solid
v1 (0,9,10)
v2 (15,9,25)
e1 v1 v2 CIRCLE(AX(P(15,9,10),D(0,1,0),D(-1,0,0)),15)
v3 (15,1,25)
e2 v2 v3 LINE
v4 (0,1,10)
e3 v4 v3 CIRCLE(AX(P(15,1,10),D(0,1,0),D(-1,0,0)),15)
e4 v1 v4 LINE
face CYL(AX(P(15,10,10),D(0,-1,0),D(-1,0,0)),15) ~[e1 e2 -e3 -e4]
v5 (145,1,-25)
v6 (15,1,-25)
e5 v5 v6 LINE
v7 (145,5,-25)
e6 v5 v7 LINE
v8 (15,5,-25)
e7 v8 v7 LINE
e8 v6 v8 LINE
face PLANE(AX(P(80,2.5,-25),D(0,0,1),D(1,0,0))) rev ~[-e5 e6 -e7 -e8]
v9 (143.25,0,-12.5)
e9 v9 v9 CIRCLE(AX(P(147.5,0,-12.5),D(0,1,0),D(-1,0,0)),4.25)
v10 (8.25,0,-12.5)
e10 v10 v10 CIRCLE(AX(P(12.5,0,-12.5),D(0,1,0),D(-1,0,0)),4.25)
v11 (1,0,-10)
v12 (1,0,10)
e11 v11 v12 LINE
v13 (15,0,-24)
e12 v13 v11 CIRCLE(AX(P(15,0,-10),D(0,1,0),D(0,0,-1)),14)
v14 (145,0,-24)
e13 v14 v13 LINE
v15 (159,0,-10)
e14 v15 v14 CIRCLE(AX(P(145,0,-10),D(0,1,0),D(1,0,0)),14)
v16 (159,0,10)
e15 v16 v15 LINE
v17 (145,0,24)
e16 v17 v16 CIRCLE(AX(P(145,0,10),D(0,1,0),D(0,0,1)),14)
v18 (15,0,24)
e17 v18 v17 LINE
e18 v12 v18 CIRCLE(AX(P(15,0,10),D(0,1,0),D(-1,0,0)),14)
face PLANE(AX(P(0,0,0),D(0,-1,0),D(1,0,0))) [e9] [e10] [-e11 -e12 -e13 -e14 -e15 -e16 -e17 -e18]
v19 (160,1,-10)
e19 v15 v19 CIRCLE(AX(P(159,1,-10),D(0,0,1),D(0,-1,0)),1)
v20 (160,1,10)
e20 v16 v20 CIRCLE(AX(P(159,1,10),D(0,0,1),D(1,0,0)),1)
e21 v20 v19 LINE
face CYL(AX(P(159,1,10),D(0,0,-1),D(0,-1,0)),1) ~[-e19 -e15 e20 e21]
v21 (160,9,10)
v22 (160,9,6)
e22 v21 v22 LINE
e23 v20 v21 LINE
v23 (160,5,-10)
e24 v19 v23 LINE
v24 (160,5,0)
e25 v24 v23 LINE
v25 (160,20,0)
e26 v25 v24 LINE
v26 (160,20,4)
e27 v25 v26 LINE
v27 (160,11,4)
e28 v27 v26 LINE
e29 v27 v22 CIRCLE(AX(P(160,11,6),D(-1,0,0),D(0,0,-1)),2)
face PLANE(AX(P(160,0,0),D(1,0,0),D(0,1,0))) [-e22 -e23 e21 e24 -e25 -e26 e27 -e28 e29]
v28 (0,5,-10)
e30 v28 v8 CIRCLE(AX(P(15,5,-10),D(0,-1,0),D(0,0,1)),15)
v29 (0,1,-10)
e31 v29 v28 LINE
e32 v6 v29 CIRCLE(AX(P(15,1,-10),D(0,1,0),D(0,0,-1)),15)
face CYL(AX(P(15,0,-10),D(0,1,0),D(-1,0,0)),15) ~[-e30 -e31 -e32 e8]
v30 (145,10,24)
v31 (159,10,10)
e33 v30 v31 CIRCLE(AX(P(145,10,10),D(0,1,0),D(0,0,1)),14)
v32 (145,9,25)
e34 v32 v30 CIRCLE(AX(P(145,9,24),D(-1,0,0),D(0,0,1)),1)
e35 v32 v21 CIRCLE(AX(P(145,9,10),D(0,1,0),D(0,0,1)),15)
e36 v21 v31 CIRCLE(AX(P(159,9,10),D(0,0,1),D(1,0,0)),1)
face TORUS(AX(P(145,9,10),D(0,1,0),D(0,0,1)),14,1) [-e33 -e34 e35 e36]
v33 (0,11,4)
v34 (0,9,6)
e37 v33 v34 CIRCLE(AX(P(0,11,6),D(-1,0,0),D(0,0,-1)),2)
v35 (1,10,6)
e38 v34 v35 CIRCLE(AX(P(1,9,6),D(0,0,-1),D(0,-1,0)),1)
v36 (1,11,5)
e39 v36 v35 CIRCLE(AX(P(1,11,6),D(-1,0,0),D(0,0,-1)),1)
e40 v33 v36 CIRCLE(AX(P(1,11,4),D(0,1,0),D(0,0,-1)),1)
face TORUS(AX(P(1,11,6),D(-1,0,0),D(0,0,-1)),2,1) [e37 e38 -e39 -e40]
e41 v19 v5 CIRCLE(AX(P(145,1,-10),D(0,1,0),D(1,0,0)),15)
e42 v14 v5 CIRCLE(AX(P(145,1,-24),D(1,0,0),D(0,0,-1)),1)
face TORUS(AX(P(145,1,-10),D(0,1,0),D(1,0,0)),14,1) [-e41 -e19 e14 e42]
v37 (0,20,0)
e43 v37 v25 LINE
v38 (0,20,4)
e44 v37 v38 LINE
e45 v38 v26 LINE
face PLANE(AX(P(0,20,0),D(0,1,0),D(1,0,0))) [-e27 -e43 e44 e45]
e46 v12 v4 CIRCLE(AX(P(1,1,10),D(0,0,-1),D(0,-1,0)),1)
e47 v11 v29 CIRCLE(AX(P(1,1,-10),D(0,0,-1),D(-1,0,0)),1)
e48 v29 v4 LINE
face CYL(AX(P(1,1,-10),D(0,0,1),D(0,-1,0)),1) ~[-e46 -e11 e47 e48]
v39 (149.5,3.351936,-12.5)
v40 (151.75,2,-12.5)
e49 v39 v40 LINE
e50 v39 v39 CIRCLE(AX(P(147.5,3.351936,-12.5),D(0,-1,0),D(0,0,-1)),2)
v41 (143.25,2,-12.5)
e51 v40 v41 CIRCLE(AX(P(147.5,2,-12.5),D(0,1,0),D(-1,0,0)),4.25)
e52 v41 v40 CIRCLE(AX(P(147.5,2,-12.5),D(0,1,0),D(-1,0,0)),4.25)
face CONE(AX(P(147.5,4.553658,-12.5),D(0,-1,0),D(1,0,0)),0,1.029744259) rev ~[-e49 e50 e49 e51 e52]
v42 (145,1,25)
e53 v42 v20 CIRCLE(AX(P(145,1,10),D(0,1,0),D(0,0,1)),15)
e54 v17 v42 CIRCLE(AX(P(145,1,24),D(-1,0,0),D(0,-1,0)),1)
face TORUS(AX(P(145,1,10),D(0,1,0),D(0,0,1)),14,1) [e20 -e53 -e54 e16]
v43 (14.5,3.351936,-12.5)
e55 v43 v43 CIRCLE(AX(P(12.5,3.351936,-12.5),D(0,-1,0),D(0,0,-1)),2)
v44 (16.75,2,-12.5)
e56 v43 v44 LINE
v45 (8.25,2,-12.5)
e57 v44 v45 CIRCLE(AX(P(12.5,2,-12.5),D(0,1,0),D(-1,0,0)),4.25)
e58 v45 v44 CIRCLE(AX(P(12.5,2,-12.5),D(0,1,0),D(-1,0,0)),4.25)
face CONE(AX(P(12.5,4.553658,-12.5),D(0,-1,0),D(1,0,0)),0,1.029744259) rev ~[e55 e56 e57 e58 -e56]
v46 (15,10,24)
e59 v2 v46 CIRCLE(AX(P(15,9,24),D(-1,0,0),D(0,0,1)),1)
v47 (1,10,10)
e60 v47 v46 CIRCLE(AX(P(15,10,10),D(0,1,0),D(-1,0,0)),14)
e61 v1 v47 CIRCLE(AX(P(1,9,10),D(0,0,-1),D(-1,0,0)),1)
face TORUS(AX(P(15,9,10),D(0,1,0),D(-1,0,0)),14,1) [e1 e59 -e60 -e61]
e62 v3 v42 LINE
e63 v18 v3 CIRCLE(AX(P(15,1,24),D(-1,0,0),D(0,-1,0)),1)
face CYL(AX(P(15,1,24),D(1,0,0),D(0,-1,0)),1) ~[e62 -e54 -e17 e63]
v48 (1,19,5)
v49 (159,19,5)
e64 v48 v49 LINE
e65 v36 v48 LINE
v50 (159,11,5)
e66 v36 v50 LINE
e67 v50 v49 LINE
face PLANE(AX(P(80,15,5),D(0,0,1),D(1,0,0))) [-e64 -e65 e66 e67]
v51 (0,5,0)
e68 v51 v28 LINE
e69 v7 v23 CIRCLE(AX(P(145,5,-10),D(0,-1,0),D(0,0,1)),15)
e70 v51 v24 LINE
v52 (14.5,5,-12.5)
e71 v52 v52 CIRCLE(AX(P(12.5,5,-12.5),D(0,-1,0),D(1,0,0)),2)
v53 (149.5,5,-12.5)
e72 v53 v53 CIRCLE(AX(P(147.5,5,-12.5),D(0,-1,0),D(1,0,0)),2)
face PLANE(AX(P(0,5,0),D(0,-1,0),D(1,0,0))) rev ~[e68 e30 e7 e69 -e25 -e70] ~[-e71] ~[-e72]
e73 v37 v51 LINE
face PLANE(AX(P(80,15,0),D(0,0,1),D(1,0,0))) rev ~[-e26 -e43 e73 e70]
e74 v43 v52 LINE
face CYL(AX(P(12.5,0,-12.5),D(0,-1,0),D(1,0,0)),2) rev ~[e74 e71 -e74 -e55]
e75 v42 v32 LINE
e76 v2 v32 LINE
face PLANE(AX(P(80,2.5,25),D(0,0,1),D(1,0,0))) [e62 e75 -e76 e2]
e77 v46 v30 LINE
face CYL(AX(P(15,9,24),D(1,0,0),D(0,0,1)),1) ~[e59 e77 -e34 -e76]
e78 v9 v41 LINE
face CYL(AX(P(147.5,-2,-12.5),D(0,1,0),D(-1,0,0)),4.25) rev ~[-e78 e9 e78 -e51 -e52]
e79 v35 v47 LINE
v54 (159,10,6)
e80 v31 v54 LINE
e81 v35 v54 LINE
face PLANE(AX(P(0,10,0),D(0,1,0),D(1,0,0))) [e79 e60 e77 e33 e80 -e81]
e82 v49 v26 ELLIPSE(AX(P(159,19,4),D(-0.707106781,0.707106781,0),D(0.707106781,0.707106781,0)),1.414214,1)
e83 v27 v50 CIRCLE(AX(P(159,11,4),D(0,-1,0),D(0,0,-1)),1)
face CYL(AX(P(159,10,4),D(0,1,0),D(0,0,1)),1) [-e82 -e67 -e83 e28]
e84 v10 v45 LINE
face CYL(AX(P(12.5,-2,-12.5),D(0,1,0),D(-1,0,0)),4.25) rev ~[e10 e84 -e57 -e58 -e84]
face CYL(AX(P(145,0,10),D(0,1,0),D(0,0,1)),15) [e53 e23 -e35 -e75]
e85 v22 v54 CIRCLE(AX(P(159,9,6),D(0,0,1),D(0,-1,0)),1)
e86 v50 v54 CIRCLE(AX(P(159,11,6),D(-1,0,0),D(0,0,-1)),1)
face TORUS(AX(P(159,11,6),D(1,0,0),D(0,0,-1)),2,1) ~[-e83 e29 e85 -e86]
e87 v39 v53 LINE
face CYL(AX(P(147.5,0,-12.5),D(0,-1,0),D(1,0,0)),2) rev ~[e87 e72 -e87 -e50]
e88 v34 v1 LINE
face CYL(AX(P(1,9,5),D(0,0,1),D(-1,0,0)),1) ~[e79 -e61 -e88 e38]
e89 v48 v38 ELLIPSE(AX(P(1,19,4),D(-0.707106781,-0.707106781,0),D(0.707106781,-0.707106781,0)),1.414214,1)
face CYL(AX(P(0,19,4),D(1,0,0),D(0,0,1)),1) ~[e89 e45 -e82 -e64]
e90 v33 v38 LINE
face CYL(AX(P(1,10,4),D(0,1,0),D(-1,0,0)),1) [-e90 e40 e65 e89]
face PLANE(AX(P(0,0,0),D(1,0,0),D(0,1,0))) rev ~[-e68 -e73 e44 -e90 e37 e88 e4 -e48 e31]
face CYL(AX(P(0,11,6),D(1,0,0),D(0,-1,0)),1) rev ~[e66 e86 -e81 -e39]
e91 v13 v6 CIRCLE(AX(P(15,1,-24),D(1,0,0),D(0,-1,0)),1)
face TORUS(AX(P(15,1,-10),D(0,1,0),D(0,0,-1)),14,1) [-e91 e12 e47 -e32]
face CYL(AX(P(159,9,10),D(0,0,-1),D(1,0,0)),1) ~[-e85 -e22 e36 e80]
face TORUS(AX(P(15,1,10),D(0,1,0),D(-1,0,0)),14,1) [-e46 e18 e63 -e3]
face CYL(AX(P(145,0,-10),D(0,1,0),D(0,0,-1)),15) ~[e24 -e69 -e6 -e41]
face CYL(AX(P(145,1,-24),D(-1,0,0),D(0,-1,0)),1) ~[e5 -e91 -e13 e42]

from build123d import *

# Parameters (mm, degrees)
F0_W     = 160
F0_H     = 5
F1_DEPTH = 25
F0_H_2   = 10
F2_DEPTH = 5
F3_DEPTH = 25
F4_R     = 2
F5_DEPTH = 5
F6_D     = 8.5
F6_DEPTH = 2
F6_TIP   = 2.5536576309
F7_R     = 15
F8_R     = 1


with BuildPart() as f1:
    # F0 (on Top) → F1 (new body)
    with BuildSketch(Plane.XY):
        with Locations((80, 2.5)):
            Rectangle(F0_W, F0_H)
        with Locations((80, 7.5)):
            Rectangle(F0_W, F0_H)
    extrude(amount=F1_DEPTH)

    # F0 (on Top) → F2 (join)
    with BuildSketch(Plane.XY):
        with Locations((80, 15)):
            Rectangle(F0_W, F0_H_2)
    extrude(amount=F2_DEPTH)

    # F0 (on Top) → F3 (join)
    with BuildSketch(Plane.XY):
        with Locations((80, 2.5)):
            Rectangle(F0_W, F0_H)
    extrude(amount=-F3_DEPTH)

    # F4 (on face) → F5 (cut, through all)
    with BuildSketch(Plane.XZ):
        with Locations((12.5, -12.5)):
            Circle(F4_R)
        with Locations((147.5, -12.5)):
            Circle(F4_R)
    extrude(amount=-F5_DEPTH, mode=Mode.SUBTRACT)

    # F6
    with Locations(Plane.XZ):
        with Locations((12.5, -12.5), (147.5, -12.5)):
            Hole(F6_D / 2, depth=F6_DEPTH)
            with Locations((0, 0, -(F6_DEPTH + F6_TIP / 2))):  # 118° drill point
                Cone(0, F6_D / 2, F6_TIP, mode=Mode.SUBTRACT)

    # F7
    f7_edges = [f1.edges().sort_by_distance(p)[0] for p in [
        (160, 2.5, -25),
        (0, 2.5, -25),
        (160, 5, 25),
        (0, 5, 25),
    ]]
    fillet(f7_edges, radius=F7_R)

    # F8
    f8_edges = [f1.edges().sort_by_distance(p)[0] for p in [
        (0, 10, 7.5),
        (4.393398, 10, 20.606602),
        (80, 10, 5),
        (80, 10, 25),
        (160, 10, 7.5),
        (155.606602, 10, 20.606602),
        (80, 0, 25),
        (80, 20, 5),
        (0, 0, 0),
        (4.393398, 0, 20.606602),
        (4.393398, 0, -20.606602),
        (80, 0, -25),
        (155.606602, 0, 20.606602),
        (155.606602, 0, -20.606602),
        (160, 0, 0),
        (0, 15, 5),
        (160, 15, 5),
    ]]
    fillet(f8_edges, radius=F8_R)


solid = f1.part
